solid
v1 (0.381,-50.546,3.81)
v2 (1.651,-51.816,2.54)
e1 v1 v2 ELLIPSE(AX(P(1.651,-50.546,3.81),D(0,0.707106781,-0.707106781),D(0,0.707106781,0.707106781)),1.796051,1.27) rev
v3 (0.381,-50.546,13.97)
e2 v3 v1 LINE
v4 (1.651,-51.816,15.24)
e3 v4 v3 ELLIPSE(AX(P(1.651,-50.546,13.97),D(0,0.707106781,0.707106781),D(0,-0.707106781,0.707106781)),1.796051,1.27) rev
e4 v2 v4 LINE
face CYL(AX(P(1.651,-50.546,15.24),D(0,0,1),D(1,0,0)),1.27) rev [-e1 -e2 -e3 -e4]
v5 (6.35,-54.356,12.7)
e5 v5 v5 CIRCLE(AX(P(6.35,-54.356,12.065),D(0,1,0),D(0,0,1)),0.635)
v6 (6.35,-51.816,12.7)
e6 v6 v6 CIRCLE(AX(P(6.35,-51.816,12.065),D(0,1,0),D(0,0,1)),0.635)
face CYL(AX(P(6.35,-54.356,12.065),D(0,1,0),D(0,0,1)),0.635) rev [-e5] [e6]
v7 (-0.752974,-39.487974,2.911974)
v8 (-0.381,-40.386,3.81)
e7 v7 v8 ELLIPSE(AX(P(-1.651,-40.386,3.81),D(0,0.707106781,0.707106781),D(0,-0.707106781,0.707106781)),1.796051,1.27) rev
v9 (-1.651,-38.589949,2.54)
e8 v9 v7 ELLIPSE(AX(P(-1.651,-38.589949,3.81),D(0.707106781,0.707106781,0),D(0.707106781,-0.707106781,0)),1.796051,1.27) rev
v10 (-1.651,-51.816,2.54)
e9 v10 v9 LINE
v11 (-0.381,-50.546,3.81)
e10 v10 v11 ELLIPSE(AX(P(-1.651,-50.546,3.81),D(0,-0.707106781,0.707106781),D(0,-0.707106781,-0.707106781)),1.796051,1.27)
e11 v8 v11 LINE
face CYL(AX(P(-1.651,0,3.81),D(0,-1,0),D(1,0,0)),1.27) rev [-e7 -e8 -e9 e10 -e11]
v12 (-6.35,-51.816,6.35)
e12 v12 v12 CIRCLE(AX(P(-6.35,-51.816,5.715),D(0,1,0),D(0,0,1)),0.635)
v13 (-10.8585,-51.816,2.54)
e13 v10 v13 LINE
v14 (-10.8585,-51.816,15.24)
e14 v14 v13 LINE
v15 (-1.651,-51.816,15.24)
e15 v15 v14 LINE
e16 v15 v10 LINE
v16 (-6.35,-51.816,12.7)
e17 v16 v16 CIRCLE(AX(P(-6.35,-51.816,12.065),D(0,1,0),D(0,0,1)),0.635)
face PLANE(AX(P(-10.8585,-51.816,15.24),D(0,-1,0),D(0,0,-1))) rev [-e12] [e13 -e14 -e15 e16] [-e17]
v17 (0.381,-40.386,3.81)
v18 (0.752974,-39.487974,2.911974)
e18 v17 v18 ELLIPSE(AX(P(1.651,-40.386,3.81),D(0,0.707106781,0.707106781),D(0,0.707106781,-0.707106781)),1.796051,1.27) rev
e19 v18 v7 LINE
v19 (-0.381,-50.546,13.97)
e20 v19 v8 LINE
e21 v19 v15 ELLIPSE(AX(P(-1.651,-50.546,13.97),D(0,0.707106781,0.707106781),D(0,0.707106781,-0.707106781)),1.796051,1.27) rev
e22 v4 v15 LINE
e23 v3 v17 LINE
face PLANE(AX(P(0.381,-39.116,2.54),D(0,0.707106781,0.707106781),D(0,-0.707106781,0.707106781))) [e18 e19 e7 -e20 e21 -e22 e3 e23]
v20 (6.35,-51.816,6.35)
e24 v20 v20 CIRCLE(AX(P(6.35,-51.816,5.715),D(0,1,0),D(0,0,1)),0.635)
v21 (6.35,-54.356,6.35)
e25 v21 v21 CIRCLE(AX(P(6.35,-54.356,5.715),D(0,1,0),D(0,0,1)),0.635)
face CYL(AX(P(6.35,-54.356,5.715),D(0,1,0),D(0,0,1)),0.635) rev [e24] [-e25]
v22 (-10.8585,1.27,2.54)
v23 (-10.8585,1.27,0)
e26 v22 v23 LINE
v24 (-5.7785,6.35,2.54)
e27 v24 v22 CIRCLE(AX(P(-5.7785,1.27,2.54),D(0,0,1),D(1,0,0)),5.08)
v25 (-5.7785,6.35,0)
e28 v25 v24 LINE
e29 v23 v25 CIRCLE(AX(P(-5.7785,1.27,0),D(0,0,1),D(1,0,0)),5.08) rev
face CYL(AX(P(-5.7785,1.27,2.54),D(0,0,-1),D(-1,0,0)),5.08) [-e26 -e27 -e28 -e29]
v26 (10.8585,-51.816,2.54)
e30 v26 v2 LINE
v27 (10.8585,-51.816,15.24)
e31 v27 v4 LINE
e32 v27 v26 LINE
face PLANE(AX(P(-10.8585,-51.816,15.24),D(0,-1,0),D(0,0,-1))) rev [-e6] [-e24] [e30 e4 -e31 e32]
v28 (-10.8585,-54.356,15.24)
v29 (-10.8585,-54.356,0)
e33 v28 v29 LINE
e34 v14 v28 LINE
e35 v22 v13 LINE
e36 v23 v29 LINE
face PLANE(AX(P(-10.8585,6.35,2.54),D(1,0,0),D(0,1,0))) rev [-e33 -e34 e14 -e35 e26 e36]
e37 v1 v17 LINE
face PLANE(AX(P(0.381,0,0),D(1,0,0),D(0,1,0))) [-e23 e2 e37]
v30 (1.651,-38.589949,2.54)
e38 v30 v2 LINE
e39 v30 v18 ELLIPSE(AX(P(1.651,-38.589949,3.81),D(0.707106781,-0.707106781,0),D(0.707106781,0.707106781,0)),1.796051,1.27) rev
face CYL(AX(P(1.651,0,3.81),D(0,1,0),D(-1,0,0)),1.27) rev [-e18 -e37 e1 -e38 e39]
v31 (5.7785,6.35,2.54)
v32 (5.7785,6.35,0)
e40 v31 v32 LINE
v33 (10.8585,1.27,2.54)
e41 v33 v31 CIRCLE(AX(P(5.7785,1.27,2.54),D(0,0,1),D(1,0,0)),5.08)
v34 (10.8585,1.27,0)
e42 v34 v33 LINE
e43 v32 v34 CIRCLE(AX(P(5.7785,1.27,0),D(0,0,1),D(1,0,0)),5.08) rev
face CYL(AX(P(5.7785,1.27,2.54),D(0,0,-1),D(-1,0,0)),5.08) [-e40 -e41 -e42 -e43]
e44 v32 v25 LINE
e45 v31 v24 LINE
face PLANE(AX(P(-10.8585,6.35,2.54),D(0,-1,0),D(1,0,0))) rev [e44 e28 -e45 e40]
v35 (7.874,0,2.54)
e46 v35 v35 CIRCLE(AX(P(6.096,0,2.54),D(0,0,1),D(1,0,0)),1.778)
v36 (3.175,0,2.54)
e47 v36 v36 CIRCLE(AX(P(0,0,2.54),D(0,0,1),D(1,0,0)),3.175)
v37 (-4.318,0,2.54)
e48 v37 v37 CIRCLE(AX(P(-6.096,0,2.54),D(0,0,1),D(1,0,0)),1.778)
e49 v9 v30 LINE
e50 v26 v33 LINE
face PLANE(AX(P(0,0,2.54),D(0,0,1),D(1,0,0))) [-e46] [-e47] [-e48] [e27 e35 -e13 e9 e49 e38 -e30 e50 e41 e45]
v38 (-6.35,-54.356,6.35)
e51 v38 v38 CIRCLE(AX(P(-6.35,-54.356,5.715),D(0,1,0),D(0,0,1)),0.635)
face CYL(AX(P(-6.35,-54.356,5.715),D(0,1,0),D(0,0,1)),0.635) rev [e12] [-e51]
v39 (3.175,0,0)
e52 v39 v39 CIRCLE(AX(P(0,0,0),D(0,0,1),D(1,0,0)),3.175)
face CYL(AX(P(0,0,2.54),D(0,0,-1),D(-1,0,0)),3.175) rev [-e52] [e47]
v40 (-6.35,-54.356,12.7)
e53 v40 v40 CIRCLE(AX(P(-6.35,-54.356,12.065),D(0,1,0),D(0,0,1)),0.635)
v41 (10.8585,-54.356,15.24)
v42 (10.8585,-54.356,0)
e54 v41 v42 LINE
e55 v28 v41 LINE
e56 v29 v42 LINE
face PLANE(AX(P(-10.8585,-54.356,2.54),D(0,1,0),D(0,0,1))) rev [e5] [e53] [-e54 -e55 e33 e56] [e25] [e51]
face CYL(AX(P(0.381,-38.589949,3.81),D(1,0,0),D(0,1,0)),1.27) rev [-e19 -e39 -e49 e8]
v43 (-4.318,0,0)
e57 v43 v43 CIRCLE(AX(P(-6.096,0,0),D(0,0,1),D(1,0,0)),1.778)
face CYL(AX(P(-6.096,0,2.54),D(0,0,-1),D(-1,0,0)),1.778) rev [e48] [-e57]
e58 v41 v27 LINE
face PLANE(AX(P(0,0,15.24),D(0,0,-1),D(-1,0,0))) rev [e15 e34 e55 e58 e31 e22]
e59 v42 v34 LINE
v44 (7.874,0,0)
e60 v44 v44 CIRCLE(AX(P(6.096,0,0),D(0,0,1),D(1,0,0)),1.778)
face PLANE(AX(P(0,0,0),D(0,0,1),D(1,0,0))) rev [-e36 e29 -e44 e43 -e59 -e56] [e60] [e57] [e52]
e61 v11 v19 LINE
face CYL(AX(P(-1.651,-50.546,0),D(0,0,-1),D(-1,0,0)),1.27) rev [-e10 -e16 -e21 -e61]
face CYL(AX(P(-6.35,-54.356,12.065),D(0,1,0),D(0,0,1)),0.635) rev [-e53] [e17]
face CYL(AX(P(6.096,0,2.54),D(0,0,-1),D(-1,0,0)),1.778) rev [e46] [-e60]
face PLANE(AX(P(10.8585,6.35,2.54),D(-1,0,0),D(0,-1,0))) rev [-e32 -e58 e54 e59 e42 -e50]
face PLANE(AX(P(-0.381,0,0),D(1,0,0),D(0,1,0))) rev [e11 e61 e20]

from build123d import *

# Parameters (mm, degrees)
SKETCH2_W                = 21.717
SKETCH2_H                = 60.706
SKETCH2_R                = 3.175
SKETCH2_R_2              = 1.778
BOSS_EXTRUDE1_DEPTH      = 2.54
SKETCH3_W                = 21.717
SKETCH3_H                = 2.54
BOSS_EXTRUDE2_DEPTH      = 12.7
BOSS_EXTRUDE3_DEPTH      = 0.381
BOSS_EXTRUDE3_DEPTH_BACK = 0.381
SKETCH6_R                = 0.635
CUT_EXTRUDE1_DEPTH       = 62.101949054
FILLET1_R                = 5.08
FILLET2_R                = 1.27


with BuildPart() as part:
    # Sketch2 → Boss-Extrude1 (new body)
    with BuildSketch(Plane.XY):
        with Locations((0, -24.003)):
            Rectangle(SKETCH2_W, SKETCH2_H)
        Circle(SKETCH2_R, mode=Mode.SUBTRACT)
        with Locations((6.096, 0)):
            Circle(SKETCH2_R_2, mode=Mode.SUBTRACT)
        with Locations((-6.096, 0)):
            Circle(SKETCH2_R_2, mode=Mode.SUBTRACT)
    extrude(amount=BOSS_EXTRUDE1_DEPTH)

    # Sketch3 → Boss-Extrude2 (add)
    with BuildSketch(Plane.XY.offset(2.54)):
        with Locations((0, -53.086)):
            Rectangle(SKETCH3_W, SKETCH3_H)
    extrude(amount=BOSS_EXTRUDE2_DEPTH)

    # Sketch5 → Boss-Extrude3 (add, two sides: drawn at the far end of the back side and taken through both)
    with BuildSketch(Plane.ZY.offset(-BOSS_EXTRUDE3_DEPTH_BACK)):
        Polygon((15.24, -51.816), (2.54, -51.816), (2.54, -39.116), align=None)
    extrude(amount=BOSS_EXTRUDE3_DEPTH + BOSS_EXTRUDE3_DEPTH_BACK)

    # Sketch6 → Cut-Extrude1 (cut, through all)
    with BuildSketch(Plane(origin=(0, -51.816, 0), x_dir=(1, 0, 0), z_dir=(0, 1, 0))):
        with Locations(Location((-6.35, -5.715, 0), (0, 0, 270))):
            Circle(SKETCH6_R)
        with Locations(Location((6.35, -5.715, 0), (0, 0, 270))):
            Circle(SKETCH6_R)
        with Locations(Location((6.35, -12.065, 0), (0, 0, 270))):
            Circle(SKETCH6_R)
        with Locations(Location((-6.35, -12.065, 0), (0, 0, 270))):
            Circle(SKETCH6_R)
    extrude(amount=-CUT_EXTRUDE1_DEPTH, mode=Mode.SUBTRACT)

    # Fillet1
    fillet1_edges = [part.edges().sort_by_distance(p)[0] for p in [
        (10.8585, 6.35, 1.27),
        (-10.8585, 6.35, 1.27),
    ]]
    fillet(fillet1_edges, radius=FILLET1_R)

    # Fillet2
    # the kernel refuses this fillet: 1.27 mm, written as the material it adds along each edge
    with BuildSketch(Plane(origin=(0.381, -51.816, 2.54), x_dir=(1, 0, 0), z_dir=(0, 1, 0))) as fillet2_piece_1_section:
        with BuildLine():
            CenterArc((FILLET2_R, -FILLET2_R), FILLET2_R, 90, 90)
            Line((0, -FILLET2_R), (-FILLET2_R * 0.02, -FILLET2_R))
            Line((-FILLET2_R * 0.02, -FILLET2_R), (-FILLET2_R * 0.02, FILLET2_R * 0.02))
            Line((-FILLET2_R * 0.02, FILLET2_R * 0.02), (FILLET2_R, FILLET2_R * 0.02))
            Line((FILLET2_R, FILLET2_R * 0.02), (FILLET2_R, 0))
        make_face()
    fillet2_piece_1 = extrude(amount=15.875, mode=Mode.PRIVATE)
    fillet2_piece_1 = split(fillet2_piece_1, bisect_by=Plane(origin=(0.67208957, -42.502111902, 5.926111902), z_dir=(0, -0.7071067811865475, -0.7071067811865477)), keep=Keep.TOP, mode=Mode.PRIVATE)
    add(fillet2_piece_1)
    with BuildSketch(Plane(origin=(-0.381, -51.816, 2.54), x_dir=(-1, 0, 0), z_dir=(0, 1, 0))) as fillet2_piece_2_section:
        with BuildLine():
            CenterArc((FILLET2_R, FILLET2_R), FILLET2_R, 180, 90)
            Line((0, FILLET2_R), (-FILLET2_R * 0.02, FILLET2_R))
            Line((-FILLET2_R * 0.02, FILLET2_R), (-FILLET2_R * 0.02, -FILLET2_R * 0.02))
            Line((-FILLET2_R * 0.02, -FILLET2_R * 0.02), (FILLET2_R, -FILLET2_R * 0.02))
            Line((FILLET2_R, -FILLET2_R * 0.02), (FILLET2_R, 0))
        make_face()
    fillet2_piece_2 = extrude(amount=15.875, mode=Mode.PRIVATE)
    fillet2_piece_2 = split(fillet2_piece_2, bisect_by=Plane(origin=(-0.67208957, -42.502111902, 5.926111902), z_dir=(0, -0.7071067811865475, -0.7071067811865477)), keep=Keep.TOP, mode=Mode.PRIVATE)
    add(fillet2_piece_2)
    with BuildSketch(Plane(origin=(-0.381, -51.816, 15.24), x_dir=(0, 1, 0), z_dir=(0, 0, -1))) as fillet2_piece_3_section:
        with BuildLine():
            CenterArc((FILLET2_R, -FILLET2_R), FILLET2_R, 90, 90)
            Line((0, -FILLET2_R), (-FILLET2_R * 0.02, -FILLET2_R))
            Line((-FILLET2_R * 0.02, -FILLET2_R), (-FILLET2_R * 0.02, FILLET2_R * 0.02))
            Line((-FILLET2_R * 0.02, FILLET2_R * 0.02), (FILLET2_R, FILLET2_R * 0.02))
            Line((FILLET2_R, FILLET2_R * 0.02), (FILLET2_R, 0))
        make_face()
    fillet2_piece_3 = extrude(amount=12.7, mode=Mode.PRIVATE)
    fillet2_piece_3 = split(fillet2_piece_3, bisect_by=Plane(origin=(-0.672062457, -48.429609874, 11.853609874), z_dir=(0, -0.7071067811865475, -0.7071067811865477)), keep=Keep.TOP, mode=Mode.PRIVATE)
    add(fillet2_piece_3)
    with BuildSketch(Plane(origin=(0.381, -51.816, 15.24), x_dir=(1, 0, 0), z_dir=(0, 0, -1))) as fillet2_piece_4_section:
        with BuildLine():
            CenterArc((FILLET2_R, -FILLET2_R), FILLET2_R, 90, 90)
            Line((0, -FILLET2_R), (-FILLET2_R * 0.02, -FILLET2_R))
            Line((-FILLET2_R * 0.02, -FILLET2_R), (-FILLET2_R * 0.02, FILLET2_R * 0.02))
            Line((-FILLET2_R * 0.02, FILLET2_R * 0.02), (FILLET2_R, FILLET2_R * 0.02))
            Line((FILLET2_R, FILLET2_R * 0.02), (FILLET2_R, 0))
        make_face()
    fillet2_piece_4 = extrude(amount=12.7, mode=Mode.PRIVATE)
    fillet2_piece_4 = split(fillet2_piece_4, bisect_by=Plane(origin=(0.672062457, -48.429609874, 11.853609874), z_dir=(0, -0.7071067811865475, -0.7071067811865477)), keep=Keep.TOP, mode=Mode.PRIVATE)
    add(fillet2_piece_4)
    with BuildSketch(Plane(origin=(0.381, -39.116, 2.54), x_dir=(0, 1, 0), z_dir=(-1, 0, 0))) as fillet2_piece_5:
        with BuildLine():
            CenterArc((FILLET2_R * 0.414213562373, -FILLET2_R), FILLET2_R, 90, 45)
            Line((-FILLET2_R * 0.292893218813, -FILLET2_R * 0.292893218813), (-FILLET2_R * 0.307035354437, -FILLET2_R * 0.27875108319))
            Line((-FILLET2_R * 0.307035354437, -FILLET2_R * 0.27875108319), (-FILLET2_R * 0.00828427124746, FILLET2_R * 0.02))
            Line((-FILLET2_R * 0.00828427124746, FILLET2_R * 0.02), (FILLET2_R * 0.414213562373, FILLET2_R * 0.02))
            Line((FILLET2_R * 0.414213562373, FILLET2_R * 0.02), (FILLET2_R * 0.414213562373, 0))
        make_face()
    extrude(amount=0.762)
    with BuildSketch(Plane(origin=(0.381, -54.991, 2.54), x_dir=(1, 0, 0), z_dir=(0, 1, 0))) as fillet2_piece_6a_section:
        with BuildLine():
            CenterArc((FILLET2_R, -FILLET2_R), FILLET2_R, 90, 90)
            Line((0, -FILLET2_R), (-FILLET2_R * 0.02, -FILLET2_R))
            Line((-FILLET2_R * 0.02, -FILLET2_R), (-FILLET2_R * 0.02, FILLET2_R * 0.02))
            Line((-FILLET2_R * 0.02, FILLET2_R * 0.02), (FILLET2_R, FILLET2_R * 0.02))
            Line((FILLET2_R, FILLET2_R * 0.02), (FILLET2_R, 0))
        make_face()
    fillet2_piece_6a = extrude(amount=19.05, mode=Mode.PRIVATE)
    fillet2_piece_6a = split(fillet2_piece_6a, bisect_by=Plane(origin=(0.668521795, -51.816, 2.827521795), z_dir=(0, -1, 0)), keep=Keep.TOP, mode=Mode.PRIVATE)
    with BuildSketch(Plane(origin=(0.381, -51.816, 15.24), x_dir=(1, 0, 0), z_dir=(0, 0, -1))) as fillet2_piece_6b_section:
        with BuildLine():
            CenterArc((FILLET2_R, -FILLET2_R), FILLET2_R, 90, 90)
            Line((0, -FILLET2_R), (-FILLET2_R * 0.02, -FILLET2_R))
            Line((-FILLET2_R * 0.02, -FILLET2_R), (-FILLET2_R * 0.02, FILLET2_R * 0.02))
            Line((-FILLET2_R * 0.02, FILLET2_R * 0.02), (FILLET2_R, FILLET2_R * 0.02))
            Line((FILLET2_R, FILLET2_R * 0.02), (FILLET2_R, 0))
        make_face()
    fillet2_piece_6b = extrude(amount=15.875, mode=Mode.PRIVATE)
    fillet2_piece_6b = split(fillet2_piece_6b, bisect_by=Plane(origin=(0.668521795, -51.528478205, 2.54), z_dir=(0, 0, -1)), keep=Keep.TOP, mode=Mode.PRIVATE)
    fillet2_piece_6 = fillet2_piece_6a & fillet2_piece_6b
    add(fillet2_piece_6)
    with BuildSketch(Plane(origin=(0.381, -51.816, 2.54), x_dir=(1, 0, 0), z_dir=(0, 1, 0))) as fillet2_piece_7a_section:
        with BuildLine():
            CenterArc((FILLET2_R, -FILLET2_R), FILLET2_R, 90, 90)
            Line((0, -FILLET2_R), (-FILLET2_R * 0.02, -FILLET2_R))
            Line((-FILLET2_R * 0.02, -FILLET2_R), (-FILLET2_R * 0.02, FILLET2_R * 0.02))
            Line((-FILLET2_R * 0.02, FILLET2_R * 0.02), (FILLET2_R, FILLET2_R * 0.02))
            Line((FILLET2_R, FILLET2_R * 0.02), (FILLET2_R, 0))
        make_face()
    fillet2_piece_7a = extrude(amount=15.875, mode=Mode.PRIVATE)
    fillet2_piece_7a = split(fillet2_piece_7a, bisect_by=Plane(origin=(0.655732005, -38.554128536, 1.978128536), z_dir=(0, 0.7071067811865475, 0.7071067811865477)), keep=Keep.TOP, mode=Mode.PRIVATE)
    with BuildSketch(Plane(origin=(1.696128061, -39.116, 2.54), x_dir=(0, 1, 0), z_dir=(-1, 0, 0))) as fillet2_piece_7b_section:
        with BuildLine():
            CenterArc((FILLET2_R * 0.414213562373, -FILLET2_R), FILLET2_R, 90, 45)
            Line((-FILLET2_R * 0.292893218813, -FILLET2_R * 0.292893218813), (-FILLET2_R * 0.307035354437, -FILLET2_R * 0.27875108319))
            Line((-FILLET2_R * 0.307035354437, -FILLET2_R * 0.27875108319), (-FILLET2_R * 0.00828427124746, FILLET2_R * 0.02))
            Line((-FILLET2_R * 0.00828427124746, FILLET2_R * 0.02), (FILLET2_R * 0.414213562373, FILLET2_R * 0.02))
            Line((FILLET2_R * 0.414213562373, FILLET2_R * 0.02), (FILLET2_R * 0.414213562373, 0))
        make_face()
    fillet2_piece_7b = extrude(amount=2.077128061, mode=Mode.PRIVATE)
    fillet2_piece_7b = split(fillet2_piece_7b, bisect_by=Plane(origin=(0.381, -39.083484699, 2.618498881), z_dir=(1, 0, 0)), keep=Keep.TOP, mode=Mode.PRIVATE)
    fillet2_piece_7 = fillet2_piece_7a & fillet2_piece_7b
    add(fillet2_piece_7)
    with BuildSketch(Plane(origin=(-0.381, -54.991, 2.54), x_dir=(-1, 0, 0), z_dir=(0, 1, 0))) as fillet2_piece_8a_section:
        with BuildLine():
            CenterArc((FILLET2_R, FILLET2_R), FILLET2_R, 180, 90)
            Line((0, FILLET2_R), (-FILLET2_R * 0.02, FILLET2_R))
            Line((-FILLET2_R * 0.02, FILLET2_R), (-FILLET2_R * 0.02, -FILLET2_R * 0.02))
            Line((-FILLET2_R * 0.02, -FILLET2_R * 0.02), (FILLET2_R, -FILLET2_R * 0.02))
            Line((FILLET2_R, -FILLET2_R * 0.02), (FILLET2_R, 0))
        make_face()
    fillet2_piece_8a = extrude(amount=19.05, mode=Mode.PRIVATE)
    fillet2_piece_8a = split(fillet2_piece_8a, bisect_by=Plane(origin=(-0.668521795, -51.816, 2.827521795), z_dir=(0, -1, 0)), keep=Keep.TOP, mode=Mode.PRIVATE)
    with BuildSketch(Plane(origin=(-0.381, -51.816, 15.24), x_dir=(0, 1, 0), z_dir=(0, 0, -1))) as fillet2_piece_8b_section:
        with BuildLine():
            CenterArc((FILLET2_R, -FILLET2_R), FILLET2_R, 90, 90)
            Line((0, -FILLET2_R), (-FILLET2_R * 0.02, -FILLET2_R))
            Line((-FILLET2_R * 0.02, -FILLET2_R), (-FILLET2_R * 0.02, FILLET2_R * 0.02))
            Line((-FILLET2_R * 0.02, FILLET2_R * 0.02), (FILLET2_R, FILLET2_R * 0.02))
            Line((FILLET2_R, FILLET2_R * 0.02), (FILLET2_R, 0))
        make_face()
    fillet2_piece_8b = extrude(amount=15.875, mode=Mode.PRIVATE)
    fillet2_piece_8b = split(fillet2_piece_8b, bisect_by=Plane(origin=(-0.668521795, -51.528478205, 2.54), z_dir=(0, 0, -1)), keep=Keep.TOP, mode=Mode.PRIVATE)
    fillet2_piece_8 = fillet2_piece_8a & fillet2_piece_8b
    add(fillet2_piece_8)
    with BuildSketch(Plane(origin=(0.381, -39.116, 2.54), x_dir=(0, 1, 0), z_dir=(-1, 0, 0))) as fillet2_piece_9a_section:
        with BuildLine():
            CenterArc((FILLET2_R * 0.414213562373, -FILLET2_R), FILLET2_R, 90, 45)
            Line((-FILLET2_R * 0.292893218813, -FILLET2_R * 0.292893218813), (-FILLET2_R * 0.307035354437, -FILLET2_R * 0.27875108319))
            Line((-FILLET2_R * 0.307035354437, -FILLET2_R * 0.27875108319), (-FILLET2_R * 0.00828427124746, FILLET2_R * 0.02))
            Line((-FILLET2_R * 0.00828427124746, FILLET2_R * 0.02), (FILLET2_R * 0.414213562373, FILLET2_R * 0.02))
            Line((FILLET2_R * 0.414213562373, FILLET2_R * 0.02), (FILLET2_R * 0.414213562373, 0))
        make_face()
    fillet2_piece_9a = extrude(amount=2.077128061, mode=Mode.PRIVATE)
    fillet2_piece_9a = split(fillet2_piece_9a, bisect_by=Plane(origin=(-0.381, -39.083484699, 2.618498881), z_dir=(-1, 0, 0)), keep=Keep.TOP, mode=Mode.PRIVATE)
    with BuildSketch(Plane(origin=(-0.381, -51.816, 2.54), x_dir=(-1, 0, 0), z_dir=(0, 1, 0))) as fillet2_piece_9b_section:
        with BuildLine():
            CenterArc((FILLET2_R, FILLET2_R), FILLET2_R, 180, 90)
            Line((0, FILLET2_R), (-FILLET2_R * 0.02, FILLET2_R))
            Line((-FILLET2_R * 0.02, FILLET2_R), (-FILLET2_R * 0.02, -FILLET2_R * 0.02))
            Line((-FILLET2_R * 0.02, -FILLET2_R * 0.02), (FILLET2_R, -FILLET2_R * 0.02))
            Line((FILLET2_R, -FILLET2_R * 0.02), (FILLET2_R, 0))
        make_face()
    fillet2_piece_9b = extrude(amount=15.875, mode=Mode.PRIVATE)
    fillet2_piece_9b = split(fillet2_piece_9b, bisect_by=Plane(origin=(-0.655732005, -38.554128536, 1.978128536), z_dir=(0, 0.7071067811865475, 0.7071067811865477)), keep=Keep.TOP, mode=Mode.PRIVATE)
    fillet2_piece_9 = fillet2_piece_9a & fillet2_piece_9b
    add(fillet2_piece_9)


solid = part.part
